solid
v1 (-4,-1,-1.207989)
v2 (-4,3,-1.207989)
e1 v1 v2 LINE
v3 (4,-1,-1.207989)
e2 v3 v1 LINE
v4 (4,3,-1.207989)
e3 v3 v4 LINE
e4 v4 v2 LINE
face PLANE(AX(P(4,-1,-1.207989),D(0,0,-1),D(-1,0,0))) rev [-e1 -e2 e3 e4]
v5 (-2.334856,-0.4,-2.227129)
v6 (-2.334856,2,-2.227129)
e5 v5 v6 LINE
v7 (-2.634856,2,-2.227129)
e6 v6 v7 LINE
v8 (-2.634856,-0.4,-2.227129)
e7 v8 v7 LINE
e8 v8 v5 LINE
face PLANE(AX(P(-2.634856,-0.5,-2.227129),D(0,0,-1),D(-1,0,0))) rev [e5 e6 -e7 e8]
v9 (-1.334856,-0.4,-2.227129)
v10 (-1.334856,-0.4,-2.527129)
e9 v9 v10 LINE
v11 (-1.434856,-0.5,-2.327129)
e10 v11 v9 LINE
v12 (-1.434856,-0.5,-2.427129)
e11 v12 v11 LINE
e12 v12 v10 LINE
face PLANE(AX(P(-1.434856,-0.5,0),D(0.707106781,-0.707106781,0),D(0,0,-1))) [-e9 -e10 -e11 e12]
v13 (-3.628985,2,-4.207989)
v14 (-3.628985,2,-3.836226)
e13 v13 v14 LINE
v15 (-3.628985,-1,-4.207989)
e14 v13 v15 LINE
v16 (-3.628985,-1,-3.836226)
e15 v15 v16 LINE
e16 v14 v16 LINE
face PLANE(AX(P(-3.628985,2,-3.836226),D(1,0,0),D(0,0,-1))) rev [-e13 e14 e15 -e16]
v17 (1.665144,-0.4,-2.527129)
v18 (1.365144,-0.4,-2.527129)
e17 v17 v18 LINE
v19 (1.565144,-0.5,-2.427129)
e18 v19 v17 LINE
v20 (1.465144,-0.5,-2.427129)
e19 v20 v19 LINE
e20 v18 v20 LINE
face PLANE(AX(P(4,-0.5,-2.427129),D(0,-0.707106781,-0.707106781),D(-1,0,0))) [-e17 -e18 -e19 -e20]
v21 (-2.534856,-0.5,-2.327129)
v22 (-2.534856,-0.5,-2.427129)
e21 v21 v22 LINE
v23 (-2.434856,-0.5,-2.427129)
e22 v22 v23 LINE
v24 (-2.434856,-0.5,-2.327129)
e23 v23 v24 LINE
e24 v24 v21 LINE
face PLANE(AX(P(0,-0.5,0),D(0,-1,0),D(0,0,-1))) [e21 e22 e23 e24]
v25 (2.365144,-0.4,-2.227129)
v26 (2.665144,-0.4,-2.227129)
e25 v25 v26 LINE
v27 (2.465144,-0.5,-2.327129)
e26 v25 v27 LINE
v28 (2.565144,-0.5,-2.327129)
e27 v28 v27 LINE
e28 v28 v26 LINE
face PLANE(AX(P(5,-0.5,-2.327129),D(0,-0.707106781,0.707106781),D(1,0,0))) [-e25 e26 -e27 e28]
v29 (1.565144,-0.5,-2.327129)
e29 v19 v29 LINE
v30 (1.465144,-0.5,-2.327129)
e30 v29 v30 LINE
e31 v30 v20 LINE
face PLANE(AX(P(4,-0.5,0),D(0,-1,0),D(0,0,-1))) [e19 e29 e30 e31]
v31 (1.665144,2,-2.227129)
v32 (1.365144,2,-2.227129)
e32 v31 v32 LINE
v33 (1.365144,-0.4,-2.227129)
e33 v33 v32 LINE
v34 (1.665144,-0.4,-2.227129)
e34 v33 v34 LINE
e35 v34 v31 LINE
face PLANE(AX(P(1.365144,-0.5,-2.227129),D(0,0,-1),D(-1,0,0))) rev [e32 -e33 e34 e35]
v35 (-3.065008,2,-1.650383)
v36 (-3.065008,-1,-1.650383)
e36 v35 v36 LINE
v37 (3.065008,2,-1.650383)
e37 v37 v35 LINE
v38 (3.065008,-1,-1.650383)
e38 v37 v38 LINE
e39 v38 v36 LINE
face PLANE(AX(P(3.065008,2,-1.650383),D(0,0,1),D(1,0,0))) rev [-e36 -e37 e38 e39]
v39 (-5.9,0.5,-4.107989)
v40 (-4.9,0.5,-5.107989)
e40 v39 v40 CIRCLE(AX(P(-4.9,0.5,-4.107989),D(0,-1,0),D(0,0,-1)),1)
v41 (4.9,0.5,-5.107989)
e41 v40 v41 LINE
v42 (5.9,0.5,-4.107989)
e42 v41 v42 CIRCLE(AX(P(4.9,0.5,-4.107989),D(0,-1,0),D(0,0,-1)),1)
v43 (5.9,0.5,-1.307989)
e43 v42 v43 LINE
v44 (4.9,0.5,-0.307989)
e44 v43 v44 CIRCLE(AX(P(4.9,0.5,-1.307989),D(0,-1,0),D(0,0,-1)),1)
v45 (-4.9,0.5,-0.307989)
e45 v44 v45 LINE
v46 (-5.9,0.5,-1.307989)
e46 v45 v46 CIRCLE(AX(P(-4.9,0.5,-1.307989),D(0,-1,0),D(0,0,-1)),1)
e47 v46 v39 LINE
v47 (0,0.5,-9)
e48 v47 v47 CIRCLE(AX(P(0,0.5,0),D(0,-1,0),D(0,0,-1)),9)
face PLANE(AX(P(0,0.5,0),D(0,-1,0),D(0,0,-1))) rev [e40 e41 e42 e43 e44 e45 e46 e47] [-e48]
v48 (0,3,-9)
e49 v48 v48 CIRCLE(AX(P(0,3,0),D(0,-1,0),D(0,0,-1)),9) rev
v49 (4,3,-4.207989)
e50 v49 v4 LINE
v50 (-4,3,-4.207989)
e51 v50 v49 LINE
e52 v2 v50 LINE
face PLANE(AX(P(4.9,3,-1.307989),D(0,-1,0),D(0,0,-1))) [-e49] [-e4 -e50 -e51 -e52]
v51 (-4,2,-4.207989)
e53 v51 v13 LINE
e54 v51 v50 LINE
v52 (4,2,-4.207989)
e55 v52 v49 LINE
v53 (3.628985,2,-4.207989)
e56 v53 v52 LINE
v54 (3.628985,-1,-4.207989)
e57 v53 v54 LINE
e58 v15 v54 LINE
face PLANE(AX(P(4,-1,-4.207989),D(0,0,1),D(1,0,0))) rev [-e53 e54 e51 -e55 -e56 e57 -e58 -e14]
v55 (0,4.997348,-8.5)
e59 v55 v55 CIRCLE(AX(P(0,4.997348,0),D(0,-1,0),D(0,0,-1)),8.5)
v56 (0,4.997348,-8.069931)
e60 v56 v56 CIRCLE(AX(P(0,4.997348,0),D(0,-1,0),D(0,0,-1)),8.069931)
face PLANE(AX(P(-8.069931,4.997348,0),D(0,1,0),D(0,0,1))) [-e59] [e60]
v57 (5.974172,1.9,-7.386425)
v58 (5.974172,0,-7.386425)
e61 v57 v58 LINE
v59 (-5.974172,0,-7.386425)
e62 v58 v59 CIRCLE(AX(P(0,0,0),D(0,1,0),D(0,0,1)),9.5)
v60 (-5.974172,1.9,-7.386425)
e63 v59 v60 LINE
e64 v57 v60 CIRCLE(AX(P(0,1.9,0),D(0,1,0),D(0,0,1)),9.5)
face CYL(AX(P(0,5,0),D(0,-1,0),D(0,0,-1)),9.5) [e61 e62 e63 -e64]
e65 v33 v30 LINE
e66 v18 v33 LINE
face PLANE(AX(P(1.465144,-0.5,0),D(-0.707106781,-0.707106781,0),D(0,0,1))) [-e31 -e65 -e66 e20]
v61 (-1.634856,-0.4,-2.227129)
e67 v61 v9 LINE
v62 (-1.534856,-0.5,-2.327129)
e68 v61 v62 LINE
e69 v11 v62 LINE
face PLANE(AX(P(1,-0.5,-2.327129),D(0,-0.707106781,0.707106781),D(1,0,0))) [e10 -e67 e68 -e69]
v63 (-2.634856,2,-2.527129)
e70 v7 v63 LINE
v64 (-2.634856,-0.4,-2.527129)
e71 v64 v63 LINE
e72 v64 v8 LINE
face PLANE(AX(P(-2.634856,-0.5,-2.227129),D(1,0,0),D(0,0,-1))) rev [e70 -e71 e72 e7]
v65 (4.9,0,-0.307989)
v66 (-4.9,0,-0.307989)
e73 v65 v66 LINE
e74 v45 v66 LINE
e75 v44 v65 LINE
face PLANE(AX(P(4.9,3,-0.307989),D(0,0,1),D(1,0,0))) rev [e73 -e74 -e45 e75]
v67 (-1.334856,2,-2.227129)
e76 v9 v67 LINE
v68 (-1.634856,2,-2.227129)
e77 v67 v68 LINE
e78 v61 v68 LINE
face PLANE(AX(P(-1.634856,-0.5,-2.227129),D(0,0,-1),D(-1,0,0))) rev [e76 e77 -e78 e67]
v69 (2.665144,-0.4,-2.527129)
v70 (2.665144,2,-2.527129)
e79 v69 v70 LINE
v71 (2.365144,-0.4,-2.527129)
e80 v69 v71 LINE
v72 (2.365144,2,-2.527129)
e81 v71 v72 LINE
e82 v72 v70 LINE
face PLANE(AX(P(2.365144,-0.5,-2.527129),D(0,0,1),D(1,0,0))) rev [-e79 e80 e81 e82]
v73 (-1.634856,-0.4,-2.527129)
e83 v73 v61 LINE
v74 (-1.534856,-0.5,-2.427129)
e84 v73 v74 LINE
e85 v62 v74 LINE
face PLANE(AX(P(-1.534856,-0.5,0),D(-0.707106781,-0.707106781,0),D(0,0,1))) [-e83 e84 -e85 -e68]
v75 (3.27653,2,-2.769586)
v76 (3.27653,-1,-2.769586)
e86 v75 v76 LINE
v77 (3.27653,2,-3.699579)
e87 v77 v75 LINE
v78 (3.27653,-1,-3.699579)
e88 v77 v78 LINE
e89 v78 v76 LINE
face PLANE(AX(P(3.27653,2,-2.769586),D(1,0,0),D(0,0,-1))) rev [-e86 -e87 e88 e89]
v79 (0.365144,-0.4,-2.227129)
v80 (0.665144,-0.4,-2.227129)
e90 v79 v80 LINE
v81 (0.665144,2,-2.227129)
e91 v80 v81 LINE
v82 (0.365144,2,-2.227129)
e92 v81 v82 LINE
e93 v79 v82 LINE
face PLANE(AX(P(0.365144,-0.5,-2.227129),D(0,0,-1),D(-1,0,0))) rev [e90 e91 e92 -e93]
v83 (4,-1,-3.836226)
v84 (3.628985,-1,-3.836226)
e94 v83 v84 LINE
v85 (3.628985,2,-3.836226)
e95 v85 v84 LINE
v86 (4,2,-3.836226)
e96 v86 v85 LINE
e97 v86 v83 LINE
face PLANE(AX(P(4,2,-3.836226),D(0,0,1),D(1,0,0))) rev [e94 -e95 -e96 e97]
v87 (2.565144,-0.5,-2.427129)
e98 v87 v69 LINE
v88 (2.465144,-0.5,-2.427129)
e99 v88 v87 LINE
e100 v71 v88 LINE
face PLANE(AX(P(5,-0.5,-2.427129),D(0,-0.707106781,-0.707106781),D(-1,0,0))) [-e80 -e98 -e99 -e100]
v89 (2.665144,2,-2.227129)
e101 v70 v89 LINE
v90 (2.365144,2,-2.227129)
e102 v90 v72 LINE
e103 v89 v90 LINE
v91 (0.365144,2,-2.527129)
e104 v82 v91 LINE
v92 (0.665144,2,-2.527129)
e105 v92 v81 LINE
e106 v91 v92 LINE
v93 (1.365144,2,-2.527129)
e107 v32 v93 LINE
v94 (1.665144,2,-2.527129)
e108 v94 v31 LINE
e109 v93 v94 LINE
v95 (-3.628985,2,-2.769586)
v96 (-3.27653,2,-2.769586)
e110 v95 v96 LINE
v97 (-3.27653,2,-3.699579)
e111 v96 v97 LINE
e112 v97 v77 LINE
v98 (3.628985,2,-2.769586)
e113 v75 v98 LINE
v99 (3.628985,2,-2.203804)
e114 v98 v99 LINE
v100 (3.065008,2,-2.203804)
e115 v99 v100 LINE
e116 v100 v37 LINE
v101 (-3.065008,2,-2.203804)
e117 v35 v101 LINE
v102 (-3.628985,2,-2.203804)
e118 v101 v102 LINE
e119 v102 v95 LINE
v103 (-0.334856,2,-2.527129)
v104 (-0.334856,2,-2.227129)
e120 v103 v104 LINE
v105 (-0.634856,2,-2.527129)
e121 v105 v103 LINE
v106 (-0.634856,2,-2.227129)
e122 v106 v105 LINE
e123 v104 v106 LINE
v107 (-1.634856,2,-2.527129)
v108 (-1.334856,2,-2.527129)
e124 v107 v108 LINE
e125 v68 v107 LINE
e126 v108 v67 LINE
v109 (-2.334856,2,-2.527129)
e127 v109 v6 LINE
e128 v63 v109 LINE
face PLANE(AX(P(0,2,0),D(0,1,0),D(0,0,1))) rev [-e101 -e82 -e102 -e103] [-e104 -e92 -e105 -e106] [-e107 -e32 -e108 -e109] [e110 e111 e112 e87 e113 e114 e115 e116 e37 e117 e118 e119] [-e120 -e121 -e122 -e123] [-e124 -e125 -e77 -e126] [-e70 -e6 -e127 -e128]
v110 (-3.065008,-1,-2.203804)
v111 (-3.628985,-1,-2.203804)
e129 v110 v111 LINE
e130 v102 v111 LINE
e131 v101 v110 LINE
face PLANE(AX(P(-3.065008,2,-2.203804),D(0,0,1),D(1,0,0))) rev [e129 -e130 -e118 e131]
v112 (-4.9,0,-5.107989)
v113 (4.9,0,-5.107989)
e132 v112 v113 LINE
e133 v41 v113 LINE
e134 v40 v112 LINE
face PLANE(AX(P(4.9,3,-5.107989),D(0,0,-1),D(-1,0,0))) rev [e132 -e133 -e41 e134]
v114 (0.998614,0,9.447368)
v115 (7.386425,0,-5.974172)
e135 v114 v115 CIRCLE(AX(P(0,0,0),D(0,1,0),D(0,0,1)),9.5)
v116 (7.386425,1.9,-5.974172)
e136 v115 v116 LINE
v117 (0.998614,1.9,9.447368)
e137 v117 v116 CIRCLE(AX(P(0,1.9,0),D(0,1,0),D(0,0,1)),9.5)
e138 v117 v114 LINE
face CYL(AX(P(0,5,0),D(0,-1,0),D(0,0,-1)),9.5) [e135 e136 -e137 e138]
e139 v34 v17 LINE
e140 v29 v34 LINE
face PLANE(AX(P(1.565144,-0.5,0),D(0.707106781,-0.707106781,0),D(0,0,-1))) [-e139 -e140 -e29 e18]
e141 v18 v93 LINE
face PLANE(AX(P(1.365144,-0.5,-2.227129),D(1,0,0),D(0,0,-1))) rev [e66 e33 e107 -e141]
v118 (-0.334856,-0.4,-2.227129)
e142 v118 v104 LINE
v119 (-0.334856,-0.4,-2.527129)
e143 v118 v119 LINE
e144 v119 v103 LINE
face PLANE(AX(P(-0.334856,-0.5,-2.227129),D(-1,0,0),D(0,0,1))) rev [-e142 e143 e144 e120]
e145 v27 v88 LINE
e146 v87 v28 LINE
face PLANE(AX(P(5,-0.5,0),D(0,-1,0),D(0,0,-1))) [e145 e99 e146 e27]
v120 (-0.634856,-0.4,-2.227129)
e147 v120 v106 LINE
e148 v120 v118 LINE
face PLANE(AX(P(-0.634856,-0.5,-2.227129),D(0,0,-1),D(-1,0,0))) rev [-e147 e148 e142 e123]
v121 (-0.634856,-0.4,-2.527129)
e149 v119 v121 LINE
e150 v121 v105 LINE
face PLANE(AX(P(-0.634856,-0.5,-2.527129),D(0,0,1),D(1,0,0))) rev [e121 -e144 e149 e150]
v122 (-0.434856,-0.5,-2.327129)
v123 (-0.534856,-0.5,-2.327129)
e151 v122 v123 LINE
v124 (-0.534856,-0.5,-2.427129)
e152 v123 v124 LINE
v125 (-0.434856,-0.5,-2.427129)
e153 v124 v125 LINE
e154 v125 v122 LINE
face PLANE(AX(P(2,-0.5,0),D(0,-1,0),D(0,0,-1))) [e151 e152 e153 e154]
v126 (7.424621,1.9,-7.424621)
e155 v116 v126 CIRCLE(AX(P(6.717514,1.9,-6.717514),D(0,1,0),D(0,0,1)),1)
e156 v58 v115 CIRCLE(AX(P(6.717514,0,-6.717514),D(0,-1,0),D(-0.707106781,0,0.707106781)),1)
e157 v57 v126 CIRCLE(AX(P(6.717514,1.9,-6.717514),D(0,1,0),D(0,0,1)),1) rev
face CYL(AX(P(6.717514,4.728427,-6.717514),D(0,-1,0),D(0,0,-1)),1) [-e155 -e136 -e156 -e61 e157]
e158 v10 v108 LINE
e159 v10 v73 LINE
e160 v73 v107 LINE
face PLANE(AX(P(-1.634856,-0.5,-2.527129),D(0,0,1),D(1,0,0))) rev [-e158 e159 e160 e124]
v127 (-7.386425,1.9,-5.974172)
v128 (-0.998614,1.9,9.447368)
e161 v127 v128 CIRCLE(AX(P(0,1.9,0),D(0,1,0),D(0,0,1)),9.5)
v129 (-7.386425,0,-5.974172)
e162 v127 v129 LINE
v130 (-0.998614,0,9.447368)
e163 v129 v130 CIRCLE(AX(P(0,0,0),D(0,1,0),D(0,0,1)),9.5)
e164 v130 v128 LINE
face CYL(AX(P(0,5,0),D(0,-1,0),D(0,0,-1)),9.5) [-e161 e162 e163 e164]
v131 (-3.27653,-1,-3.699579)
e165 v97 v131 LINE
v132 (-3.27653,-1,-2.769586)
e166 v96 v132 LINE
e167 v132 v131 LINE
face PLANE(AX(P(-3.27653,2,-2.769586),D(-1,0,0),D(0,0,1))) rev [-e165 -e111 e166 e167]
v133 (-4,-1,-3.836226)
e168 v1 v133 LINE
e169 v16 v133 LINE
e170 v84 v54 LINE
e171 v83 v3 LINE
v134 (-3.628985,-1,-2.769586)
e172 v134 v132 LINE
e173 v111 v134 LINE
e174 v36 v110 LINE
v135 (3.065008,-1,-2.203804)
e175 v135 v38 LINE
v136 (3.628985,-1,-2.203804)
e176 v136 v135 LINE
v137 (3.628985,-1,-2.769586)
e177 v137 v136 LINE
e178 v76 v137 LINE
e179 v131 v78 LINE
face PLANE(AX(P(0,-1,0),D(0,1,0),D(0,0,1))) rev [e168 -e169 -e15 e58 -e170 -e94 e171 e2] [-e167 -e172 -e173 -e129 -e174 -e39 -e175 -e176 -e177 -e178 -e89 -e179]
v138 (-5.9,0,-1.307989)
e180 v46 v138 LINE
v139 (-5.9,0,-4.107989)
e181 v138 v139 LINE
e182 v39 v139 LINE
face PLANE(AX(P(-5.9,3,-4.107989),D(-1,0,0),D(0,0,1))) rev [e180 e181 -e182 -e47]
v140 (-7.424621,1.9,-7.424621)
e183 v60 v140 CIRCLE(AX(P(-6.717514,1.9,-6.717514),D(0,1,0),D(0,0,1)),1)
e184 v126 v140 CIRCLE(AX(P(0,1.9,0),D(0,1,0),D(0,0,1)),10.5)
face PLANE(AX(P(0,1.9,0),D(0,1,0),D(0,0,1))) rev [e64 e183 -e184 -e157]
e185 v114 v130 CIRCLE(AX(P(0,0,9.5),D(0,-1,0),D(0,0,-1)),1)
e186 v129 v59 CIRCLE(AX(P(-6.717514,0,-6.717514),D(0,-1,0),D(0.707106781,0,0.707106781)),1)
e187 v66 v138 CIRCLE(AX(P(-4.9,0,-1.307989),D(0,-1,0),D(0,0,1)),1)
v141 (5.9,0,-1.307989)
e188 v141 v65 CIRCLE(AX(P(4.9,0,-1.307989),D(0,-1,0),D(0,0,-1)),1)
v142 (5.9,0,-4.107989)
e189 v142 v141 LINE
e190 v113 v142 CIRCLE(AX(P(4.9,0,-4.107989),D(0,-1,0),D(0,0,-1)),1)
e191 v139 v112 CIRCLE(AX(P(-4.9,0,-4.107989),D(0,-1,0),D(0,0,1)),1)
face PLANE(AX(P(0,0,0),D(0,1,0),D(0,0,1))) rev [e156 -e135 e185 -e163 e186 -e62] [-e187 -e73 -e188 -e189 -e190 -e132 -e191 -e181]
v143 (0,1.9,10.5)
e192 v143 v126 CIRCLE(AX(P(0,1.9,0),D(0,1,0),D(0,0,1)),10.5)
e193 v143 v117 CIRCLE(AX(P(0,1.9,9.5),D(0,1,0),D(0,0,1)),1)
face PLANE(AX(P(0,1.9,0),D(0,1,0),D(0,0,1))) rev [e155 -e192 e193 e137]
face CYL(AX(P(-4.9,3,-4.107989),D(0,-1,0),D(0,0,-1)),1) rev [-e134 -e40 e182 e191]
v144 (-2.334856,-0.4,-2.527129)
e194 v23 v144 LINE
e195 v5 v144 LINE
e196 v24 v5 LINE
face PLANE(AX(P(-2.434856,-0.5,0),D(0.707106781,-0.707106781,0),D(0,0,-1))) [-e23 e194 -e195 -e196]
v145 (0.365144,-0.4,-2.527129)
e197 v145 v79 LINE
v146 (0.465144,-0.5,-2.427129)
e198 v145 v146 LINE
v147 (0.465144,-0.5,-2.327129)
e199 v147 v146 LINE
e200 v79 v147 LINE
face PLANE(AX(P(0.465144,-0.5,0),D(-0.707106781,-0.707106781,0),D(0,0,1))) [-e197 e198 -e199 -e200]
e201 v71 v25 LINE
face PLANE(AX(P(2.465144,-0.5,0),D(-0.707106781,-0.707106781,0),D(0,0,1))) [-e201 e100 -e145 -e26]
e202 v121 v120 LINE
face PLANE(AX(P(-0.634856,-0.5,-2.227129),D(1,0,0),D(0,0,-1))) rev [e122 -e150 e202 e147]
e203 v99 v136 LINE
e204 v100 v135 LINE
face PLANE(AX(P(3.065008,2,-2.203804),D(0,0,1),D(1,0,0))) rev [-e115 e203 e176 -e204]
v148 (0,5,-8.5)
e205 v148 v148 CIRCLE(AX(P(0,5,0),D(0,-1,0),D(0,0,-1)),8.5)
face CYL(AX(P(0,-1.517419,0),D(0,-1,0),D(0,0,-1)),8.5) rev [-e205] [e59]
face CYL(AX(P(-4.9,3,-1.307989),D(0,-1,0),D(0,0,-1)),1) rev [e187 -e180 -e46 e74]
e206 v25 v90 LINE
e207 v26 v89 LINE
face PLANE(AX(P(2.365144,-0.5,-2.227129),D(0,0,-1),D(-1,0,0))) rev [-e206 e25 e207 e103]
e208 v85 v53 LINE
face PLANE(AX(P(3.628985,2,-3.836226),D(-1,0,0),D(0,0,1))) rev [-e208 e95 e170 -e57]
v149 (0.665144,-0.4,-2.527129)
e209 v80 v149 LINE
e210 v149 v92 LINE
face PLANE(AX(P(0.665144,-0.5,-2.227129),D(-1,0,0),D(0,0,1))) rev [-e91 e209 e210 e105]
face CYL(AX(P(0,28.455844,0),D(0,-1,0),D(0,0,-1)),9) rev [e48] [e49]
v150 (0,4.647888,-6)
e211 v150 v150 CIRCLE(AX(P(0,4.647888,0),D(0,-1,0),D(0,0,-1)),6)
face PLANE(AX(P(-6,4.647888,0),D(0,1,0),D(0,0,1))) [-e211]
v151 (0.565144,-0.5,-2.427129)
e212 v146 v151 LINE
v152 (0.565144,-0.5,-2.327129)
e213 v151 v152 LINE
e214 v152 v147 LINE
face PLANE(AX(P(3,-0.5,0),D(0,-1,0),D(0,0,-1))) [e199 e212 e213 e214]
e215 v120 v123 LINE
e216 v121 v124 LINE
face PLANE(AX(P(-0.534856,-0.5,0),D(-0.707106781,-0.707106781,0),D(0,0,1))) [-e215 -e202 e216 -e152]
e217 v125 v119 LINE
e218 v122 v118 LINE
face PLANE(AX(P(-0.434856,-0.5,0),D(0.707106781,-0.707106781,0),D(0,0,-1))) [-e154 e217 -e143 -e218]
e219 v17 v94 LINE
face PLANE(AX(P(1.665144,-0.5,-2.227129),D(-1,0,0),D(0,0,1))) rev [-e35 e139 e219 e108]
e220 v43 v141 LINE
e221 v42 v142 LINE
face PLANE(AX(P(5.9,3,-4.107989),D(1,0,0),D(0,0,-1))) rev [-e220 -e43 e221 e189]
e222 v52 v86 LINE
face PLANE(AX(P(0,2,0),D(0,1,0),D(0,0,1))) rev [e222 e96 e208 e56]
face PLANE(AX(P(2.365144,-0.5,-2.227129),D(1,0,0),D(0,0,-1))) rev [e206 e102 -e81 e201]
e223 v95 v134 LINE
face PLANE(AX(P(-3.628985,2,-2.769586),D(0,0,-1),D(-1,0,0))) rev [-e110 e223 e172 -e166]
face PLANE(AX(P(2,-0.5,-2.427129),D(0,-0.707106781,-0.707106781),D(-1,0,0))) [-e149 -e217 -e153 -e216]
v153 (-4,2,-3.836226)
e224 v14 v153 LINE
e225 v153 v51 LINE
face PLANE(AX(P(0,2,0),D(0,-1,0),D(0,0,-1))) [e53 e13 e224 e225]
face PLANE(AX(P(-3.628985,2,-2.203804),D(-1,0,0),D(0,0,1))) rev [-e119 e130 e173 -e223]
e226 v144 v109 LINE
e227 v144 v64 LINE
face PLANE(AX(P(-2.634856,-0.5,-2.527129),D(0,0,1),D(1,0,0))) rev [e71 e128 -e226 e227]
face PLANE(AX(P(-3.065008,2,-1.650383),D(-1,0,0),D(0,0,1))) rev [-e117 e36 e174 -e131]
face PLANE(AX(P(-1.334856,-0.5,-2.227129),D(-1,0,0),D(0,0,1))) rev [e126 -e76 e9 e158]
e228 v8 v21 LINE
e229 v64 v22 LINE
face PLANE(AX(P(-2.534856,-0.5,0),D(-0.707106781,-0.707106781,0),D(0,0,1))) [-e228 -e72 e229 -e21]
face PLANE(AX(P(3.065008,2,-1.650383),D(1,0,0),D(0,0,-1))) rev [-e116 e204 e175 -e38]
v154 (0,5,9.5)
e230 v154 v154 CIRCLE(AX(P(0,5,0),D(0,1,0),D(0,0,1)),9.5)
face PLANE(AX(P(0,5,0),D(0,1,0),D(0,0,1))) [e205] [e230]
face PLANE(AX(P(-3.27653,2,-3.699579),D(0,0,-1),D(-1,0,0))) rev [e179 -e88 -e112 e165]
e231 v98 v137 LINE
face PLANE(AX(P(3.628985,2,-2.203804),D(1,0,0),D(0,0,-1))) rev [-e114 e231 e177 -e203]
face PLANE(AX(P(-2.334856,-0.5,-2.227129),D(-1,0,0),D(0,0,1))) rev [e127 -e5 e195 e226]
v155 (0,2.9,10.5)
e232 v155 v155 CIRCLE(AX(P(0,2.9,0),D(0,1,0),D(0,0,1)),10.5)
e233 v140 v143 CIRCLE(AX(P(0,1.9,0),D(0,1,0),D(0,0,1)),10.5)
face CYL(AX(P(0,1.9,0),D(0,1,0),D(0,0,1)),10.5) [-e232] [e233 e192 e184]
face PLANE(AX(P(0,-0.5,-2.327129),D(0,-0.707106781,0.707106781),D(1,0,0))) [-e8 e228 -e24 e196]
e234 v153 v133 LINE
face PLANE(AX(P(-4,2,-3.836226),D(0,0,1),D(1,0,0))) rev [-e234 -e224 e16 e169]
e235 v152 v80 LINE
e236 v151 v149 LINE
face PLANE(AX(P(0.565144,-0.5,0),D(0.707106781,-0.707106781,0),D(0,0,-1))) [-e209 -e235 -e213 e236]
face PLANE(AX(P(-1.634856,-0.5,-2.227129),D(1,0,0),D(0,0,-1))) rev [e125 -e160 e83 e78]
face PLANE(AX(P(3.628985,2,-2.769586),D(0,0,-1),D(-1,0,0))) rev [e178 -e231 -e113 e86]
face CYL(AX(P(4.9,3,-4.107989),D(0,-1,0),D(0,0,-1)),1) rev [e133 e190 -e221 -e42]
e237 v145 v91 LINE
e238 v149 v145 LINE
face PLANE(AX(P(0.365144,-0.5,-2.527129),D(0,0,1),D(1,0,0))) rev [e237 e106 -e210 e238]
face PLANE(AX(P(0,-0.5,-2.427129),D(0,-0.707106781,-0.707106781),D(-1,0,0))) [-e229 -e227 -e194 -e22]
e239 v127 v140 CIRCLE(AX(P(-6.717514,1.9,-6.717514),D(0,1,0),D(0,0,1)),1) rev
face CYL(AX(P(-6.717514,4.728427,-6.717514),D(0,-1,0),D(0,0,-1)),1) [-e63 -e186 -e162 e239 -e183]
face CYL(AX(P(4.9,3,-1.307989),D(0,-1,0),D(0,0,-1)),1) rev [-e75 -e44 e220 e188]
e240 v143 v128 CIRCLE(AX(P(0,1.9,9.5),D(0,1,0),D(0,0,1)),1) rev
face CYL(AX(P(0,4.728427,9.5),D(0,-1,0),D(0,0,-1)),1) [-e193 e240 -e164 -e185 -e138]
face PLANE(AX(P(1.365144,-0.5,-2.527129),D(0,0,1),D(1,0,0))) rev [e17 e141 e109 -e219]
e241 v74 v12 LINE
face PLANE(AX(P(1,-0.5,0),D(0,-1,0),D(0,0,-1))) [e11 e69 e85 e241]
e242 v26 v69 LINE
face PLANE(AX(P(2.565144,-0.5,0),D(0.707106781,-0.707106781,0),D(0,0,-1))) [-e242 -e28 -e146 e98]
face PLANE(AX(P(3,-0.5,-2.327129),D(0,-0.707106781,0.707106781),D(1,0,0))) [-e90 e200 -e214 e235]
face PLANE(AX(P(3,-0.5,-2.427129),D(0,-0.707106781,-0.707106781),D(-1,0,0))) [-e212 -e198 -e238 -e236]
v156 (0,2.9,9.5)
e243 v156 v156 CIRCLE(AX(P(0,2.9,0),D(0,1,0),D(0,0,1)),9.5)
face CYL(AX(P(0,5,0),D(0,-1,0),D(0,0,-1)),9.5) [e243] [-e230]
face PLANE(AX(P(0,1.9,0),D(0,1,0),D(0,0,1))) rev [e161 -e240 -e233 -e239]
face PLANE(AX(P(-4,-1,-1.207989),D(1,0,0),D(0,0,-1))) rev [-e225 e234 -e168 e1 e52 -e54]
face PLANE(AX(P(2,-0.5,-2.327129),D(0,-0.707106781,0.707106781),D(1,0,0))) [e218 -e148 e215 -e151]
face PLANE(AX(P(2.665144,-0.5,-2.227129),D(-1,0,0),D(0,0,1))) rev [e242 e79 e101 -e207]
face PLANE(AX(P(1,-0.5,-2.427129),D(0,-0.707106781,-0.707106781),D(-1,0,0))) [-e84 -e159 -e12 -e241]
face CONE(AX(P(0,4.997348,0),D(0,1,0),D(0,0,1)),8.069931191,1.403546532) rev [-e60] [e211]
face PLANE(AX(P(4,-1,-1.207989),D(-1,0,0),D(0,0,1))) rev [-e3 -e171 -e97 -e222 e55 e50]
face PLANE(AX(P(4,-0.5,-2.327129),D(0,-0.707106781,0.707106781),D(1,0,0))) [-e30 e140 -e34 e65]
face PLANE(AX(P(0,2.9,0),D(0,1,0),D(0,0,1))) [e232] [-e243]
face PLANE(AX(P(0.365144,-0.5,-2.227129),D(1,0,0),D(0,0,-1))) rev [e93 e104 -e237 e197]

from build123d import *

# Parameters (mm, degrees)
SKETCH_1_R               = 9.5
EXTRUDE_1_DEPTH          = 5
EXTRUDE_START            = -2.1
SKETCH_2_R               = 10.5
EXTRUDE_2_DEPTH          = 1
SKETCH_5_R               = 1
EXTRUDE_3_DEPTH          = 1.9
PATTERN_CIRCULAR_1_COUNT = 2
PATTERN_CIRCULAR_1_ANGLE = 135
PATTERN_CIRCULAR_2_DEPTH = 1.9
CUT_EXTRUDE_1_DEPTH      = 3
SKETCH_8_W               = 8
SKETCH_8_H               = 3
EXTRUDE_4_DEPTH          = 4
SKETCH_9_W               = 0.371015219
SKETCH_9_H               = 0.371763235
CUT_EXTRUDE_2_DEPTH      = 3
SKETCH_10_W              = 0.3
SKETCH_10_H              = 0.3
EXTRUDE_5_DEPTH          = 2.5
PATTERN_LINEAR_1_COUNT   = 6
PATTERN_LINEAR_1_PITCH   = 1
CHAMFER_2_SIZE           = 0.1
CUT_EXTRUDE_START        = -0.5
SKETCH_12_R              = 9
CUT_EXTRUDE_3_DEPTH      = 2.5


# Read off the part's stored shape, not the designer's step: 阵列(圆周)2
with BuildPart() as part:
    # 草图1 → 凸台-拉伸1 (new body)
    with BuildSketch(Plane(origin=(0, 0, 0), x_dir=(1, 0, 0), z_dir=(0, 1, 0))):
        with Locations(Location((0, 0, 0), (0, 0, 270))):
            Circle(SKETCH_1_R)
    extrude(amount=EXTRUDE_1_DEPTH)

    # 草图2 → 凸台-拉伸2 (add)
    with BuildSketch(Plane(origin=(0, 5, 0), x_dir=(1, 0, 0), z_dir=(0, 1, 0)).offset(EXTRUDE_START)):
        with Locations(Location((0, 0, 0), (0, 0, 270))):
            Circle(SKETCH_2_R)
    extrude(amount=-EXTRUDE_2_DEPTH)

    # 草图4 → 切除-旋转1 (revolve, cut)
    with BuildSketch(Plane.XY, mode=Mode.PRIVATE) as cut_revolve_1_sk:
        Polygon((-6, 4.647888156), (-8.069931191, 4.997348238), (-8.5, 4.997348238), (-8.5, 5), (0, 5), (0, 4.647888156), align=None)
    revolve(cut_revolve_1_sk.sketch.rotate(Axis((0, -1.517418631, 0), (0, 1, 0)), 270), axis=Axis((0, -1.517418631, 0), (0, 1, 0)), mode=Mode.SUBTRACT)

    # 草图5 → 凸台-拉伸3 (add)
    with BuildSketch(Plane.XZ):
        with Locations((0, 9.5)):
            Circle(SKETCH_5_R)
    extrude_3 = extrude(amount=-EXTRUDE_3_DEPTH)

    # 阵列(圆周)1: 凸台-拉伸3 ×2 about axis
    pattern_circular_1_axis = Axis((0, -1.474680135, 0), (0, 1, 0))
    for i in range(1, PATTERN_CIRCULAR_1_COUNT):
        add(extrude_3.rotate(pattern_circular_1_axis, i * PATTERN_CIRCULAR_1_ANGLE / (PATTERN_CIRCULAR_1_COUNT - 1)))

    # 阵列(圆周)2 outline → 阵列(圆周)2 (add)
    with BuildSketch(Plane(origin=(0, 0, 0), x_dir=(1, 0, 0), z_dir=(0, 1, 0))):
        with BuildLine():
            ThreePointArc((-5.974171545, 7.386425005), (-7.424621202, 7.424621202), (-7.386425005, 5.974171545))
            ThreePointArc((-7.386425005, 5.974171545), (-6.717514421, 6.717514421), (-5.974171545, 7.386425005))
        make_face()
    extrude(amount=PATTERN_CIRCULAR_2_DEPTH)

    # 草图7 → 切除-拉伸1 (cut)
    with BuildSketch(Plane.XZ):
        with BuildLine():
            Line((4.9, -5.107989032), (-4.9, -5.107989032))
            ThreePointArc((-4.9, -5.107989032), (-5.607106781, -4.815095813), (-5.9, -4.107989032))
            Line((-5.9, -4.107989032), (-5.9, -1.307989032))
            ThreePointArc((-5.9, -1.307989032), (-5.607106781, -0.600882251), (-4.9, -0.307989032))
            Line((-4.9, -0.307989032), (4.9, -0.307989032))
            ThreePointArc((4.9, -0.307989032), (5.607106781, -0.600882251), (5.9, -1.307989032))
            Line((5.9, -1.307989032), (5.9, -4.107989032))
            ThreePointArc((5.9, -4.107989032), (5.607106781, -4.815095813), (4.9, -5.107989032))
        make_face()
    extrude(amount=-CUT_EXTRUDE_1_DEPTH, mode=Mode.SUBTRACT)

    # 草图8 → 凸台-拉伸4 (add)
    with BuildSketch(Plane.XZ.offset(-3)):
        with Locations((0, -2.707989032)):
            Rectangle(SKETCH_8_W, SKETCH_8_H)
    extrude(amount=EXTRUDE_4_DEPTH)

    # 草图9 → 切除-拉伸2 (cut)
    with BuildSketch(Plane.XZ.offset(1)):
        Polygon((3.065007513, -1.6503828), (-3.065007513, -1.6503828), (-3.065007513, -2.203803593), (-3.628984781, -2.203803593), (-3.628984781, -2.769586289), (-3.276529987, -2.769586289), (-3.276529987, -3.699579446), (3.276529987, -3.699579446), (3.276529987, -2.769586289), (3.628984781, -2.769586289), (3.628984781, -2.203803593), (3.065007513, -2.203803593), align=None)
        with Locations((-3.81449239, -4.022107415)):
            Rectangle(SKETCH_9_W, SKETCH_9_H)
        with Locations((3.81449239, -4.022107415)):
            Rectangle(SKETCH_9_W, SKETCH_9_H)
    extrude(amount=-CUT_EXTRUDE_2_DEPTH, mode=Mode.SUBTRACT)

    # 草图10 → 凸台-拉伸5 (add)
    with BuildSketch(Plane.XZ.offset(-2)):
        with Locations((-2.484856063, -2.377128525)):
            Rectangle(SKETCH_10_W, SKETCH_10_H)
    extrude_5 = extrude(amount=EXTRUDE_5_DEPTH)

    # 阵列(线性)1: 凸台-拉伸5 ×6
    with Locations(*[(i * PATTERN_LINEAR_1_PITCH, 0, 0) for i in range(1, PATTERN_LINEAR_1_COUNT)]):
        add(extrude_5)

    # 倒角2
    chamfer_2_edges = [part.edges().sort_by_distance(p)[0] for p in [
        (-2.634856063, -0.5, -2.377128525),
        (-2.484856063, -0.5, -2.527128525),
        (-2.334856063, -0.5, -2.377128525),
        (-2.484856063, -0.5, -2.227128525),
        (-1.634856063, -0.5, -2.377128525),
        (-1.484856063, -0.5, -2.527128525),
        (-1.334856063, -0.5, -2.377128525),
        (-1.484856063, -0.5, -2.227128525),
        (-0.634856063, -0.5, -2.377128525),
        (-0.484856063, -0.5, -2.527128525),
        (-0.334856063, -0.5, -2.377128525),
        (-0.484856063, -0.5, -2.227128525),
        (0.365143937, -0.5, -2.377128525),
        (0.515143937, -0.5, -2.527128525),
        (0.665143937, -0.5, -2.377128525),
        (0.515143937, -0.5, -2.227128525),
        (1.365143937, -0.5, -2.377128525),
        (1.515143937, -0.5, -2.527128525),
        (1.665143937, -0.5, -2.377128525),
        (1.515143937, -0.5, -2.227128525),
        (2.365143937, -0.5, -2.377128525),
        (2.515143937, -0.5, -2.527128525),
        (2.665143937, -0.5, -2.377128525),
        (2.515143937, -0.5, -2.227128525),
    ]]
    chamfer(chamfer_2_edges, length=CHAMFER_2_SIZE)

    # 草图12 → 切除-拉伸3 (cut)
    with BuildSketch(Plane.XZ.offset(CUT_EXTRUDE_START)):
        with Locations(Location((0, 0, 0), (0, 0, 270))):
            Circle(SKETCH_12_R)
        with BuildLine():
            Line((5.9, -4.107989032), (5.9, -1.307989032))
            ThreePointArc((5.9, -1.307989032), (5.607106781, -0.600882251), (4.9, -0.307989032))
            Line((4.9, -0.307989032), (-4.9, -0.307989032))
            ThreePointArc((-4.9, -0.307989032), (-5.607106781, -0.600882251), (-5.9, -1.307989032))
            Line((-5.9, -1.307989032), (-5.9, -4.107989032))
            ThreePointArc((-5.9, -4.107989032), (-5.607106781, -4.815095813), (-4.9, -5.107989032))
            Line((-4.9, -5.107989032), (4.9, -5.107989032))
            ThreePointArc((4.9, -5.107989032), (5.607106781, -4.815095813), (5.9, -4.107989032))
        make_face(mode=Mode.SUBTRACT)
    extrude(amount=-CUT_EXTRUDE_3_DEPTH, mode=Mode.SUBTRACT)


solid = part.part
